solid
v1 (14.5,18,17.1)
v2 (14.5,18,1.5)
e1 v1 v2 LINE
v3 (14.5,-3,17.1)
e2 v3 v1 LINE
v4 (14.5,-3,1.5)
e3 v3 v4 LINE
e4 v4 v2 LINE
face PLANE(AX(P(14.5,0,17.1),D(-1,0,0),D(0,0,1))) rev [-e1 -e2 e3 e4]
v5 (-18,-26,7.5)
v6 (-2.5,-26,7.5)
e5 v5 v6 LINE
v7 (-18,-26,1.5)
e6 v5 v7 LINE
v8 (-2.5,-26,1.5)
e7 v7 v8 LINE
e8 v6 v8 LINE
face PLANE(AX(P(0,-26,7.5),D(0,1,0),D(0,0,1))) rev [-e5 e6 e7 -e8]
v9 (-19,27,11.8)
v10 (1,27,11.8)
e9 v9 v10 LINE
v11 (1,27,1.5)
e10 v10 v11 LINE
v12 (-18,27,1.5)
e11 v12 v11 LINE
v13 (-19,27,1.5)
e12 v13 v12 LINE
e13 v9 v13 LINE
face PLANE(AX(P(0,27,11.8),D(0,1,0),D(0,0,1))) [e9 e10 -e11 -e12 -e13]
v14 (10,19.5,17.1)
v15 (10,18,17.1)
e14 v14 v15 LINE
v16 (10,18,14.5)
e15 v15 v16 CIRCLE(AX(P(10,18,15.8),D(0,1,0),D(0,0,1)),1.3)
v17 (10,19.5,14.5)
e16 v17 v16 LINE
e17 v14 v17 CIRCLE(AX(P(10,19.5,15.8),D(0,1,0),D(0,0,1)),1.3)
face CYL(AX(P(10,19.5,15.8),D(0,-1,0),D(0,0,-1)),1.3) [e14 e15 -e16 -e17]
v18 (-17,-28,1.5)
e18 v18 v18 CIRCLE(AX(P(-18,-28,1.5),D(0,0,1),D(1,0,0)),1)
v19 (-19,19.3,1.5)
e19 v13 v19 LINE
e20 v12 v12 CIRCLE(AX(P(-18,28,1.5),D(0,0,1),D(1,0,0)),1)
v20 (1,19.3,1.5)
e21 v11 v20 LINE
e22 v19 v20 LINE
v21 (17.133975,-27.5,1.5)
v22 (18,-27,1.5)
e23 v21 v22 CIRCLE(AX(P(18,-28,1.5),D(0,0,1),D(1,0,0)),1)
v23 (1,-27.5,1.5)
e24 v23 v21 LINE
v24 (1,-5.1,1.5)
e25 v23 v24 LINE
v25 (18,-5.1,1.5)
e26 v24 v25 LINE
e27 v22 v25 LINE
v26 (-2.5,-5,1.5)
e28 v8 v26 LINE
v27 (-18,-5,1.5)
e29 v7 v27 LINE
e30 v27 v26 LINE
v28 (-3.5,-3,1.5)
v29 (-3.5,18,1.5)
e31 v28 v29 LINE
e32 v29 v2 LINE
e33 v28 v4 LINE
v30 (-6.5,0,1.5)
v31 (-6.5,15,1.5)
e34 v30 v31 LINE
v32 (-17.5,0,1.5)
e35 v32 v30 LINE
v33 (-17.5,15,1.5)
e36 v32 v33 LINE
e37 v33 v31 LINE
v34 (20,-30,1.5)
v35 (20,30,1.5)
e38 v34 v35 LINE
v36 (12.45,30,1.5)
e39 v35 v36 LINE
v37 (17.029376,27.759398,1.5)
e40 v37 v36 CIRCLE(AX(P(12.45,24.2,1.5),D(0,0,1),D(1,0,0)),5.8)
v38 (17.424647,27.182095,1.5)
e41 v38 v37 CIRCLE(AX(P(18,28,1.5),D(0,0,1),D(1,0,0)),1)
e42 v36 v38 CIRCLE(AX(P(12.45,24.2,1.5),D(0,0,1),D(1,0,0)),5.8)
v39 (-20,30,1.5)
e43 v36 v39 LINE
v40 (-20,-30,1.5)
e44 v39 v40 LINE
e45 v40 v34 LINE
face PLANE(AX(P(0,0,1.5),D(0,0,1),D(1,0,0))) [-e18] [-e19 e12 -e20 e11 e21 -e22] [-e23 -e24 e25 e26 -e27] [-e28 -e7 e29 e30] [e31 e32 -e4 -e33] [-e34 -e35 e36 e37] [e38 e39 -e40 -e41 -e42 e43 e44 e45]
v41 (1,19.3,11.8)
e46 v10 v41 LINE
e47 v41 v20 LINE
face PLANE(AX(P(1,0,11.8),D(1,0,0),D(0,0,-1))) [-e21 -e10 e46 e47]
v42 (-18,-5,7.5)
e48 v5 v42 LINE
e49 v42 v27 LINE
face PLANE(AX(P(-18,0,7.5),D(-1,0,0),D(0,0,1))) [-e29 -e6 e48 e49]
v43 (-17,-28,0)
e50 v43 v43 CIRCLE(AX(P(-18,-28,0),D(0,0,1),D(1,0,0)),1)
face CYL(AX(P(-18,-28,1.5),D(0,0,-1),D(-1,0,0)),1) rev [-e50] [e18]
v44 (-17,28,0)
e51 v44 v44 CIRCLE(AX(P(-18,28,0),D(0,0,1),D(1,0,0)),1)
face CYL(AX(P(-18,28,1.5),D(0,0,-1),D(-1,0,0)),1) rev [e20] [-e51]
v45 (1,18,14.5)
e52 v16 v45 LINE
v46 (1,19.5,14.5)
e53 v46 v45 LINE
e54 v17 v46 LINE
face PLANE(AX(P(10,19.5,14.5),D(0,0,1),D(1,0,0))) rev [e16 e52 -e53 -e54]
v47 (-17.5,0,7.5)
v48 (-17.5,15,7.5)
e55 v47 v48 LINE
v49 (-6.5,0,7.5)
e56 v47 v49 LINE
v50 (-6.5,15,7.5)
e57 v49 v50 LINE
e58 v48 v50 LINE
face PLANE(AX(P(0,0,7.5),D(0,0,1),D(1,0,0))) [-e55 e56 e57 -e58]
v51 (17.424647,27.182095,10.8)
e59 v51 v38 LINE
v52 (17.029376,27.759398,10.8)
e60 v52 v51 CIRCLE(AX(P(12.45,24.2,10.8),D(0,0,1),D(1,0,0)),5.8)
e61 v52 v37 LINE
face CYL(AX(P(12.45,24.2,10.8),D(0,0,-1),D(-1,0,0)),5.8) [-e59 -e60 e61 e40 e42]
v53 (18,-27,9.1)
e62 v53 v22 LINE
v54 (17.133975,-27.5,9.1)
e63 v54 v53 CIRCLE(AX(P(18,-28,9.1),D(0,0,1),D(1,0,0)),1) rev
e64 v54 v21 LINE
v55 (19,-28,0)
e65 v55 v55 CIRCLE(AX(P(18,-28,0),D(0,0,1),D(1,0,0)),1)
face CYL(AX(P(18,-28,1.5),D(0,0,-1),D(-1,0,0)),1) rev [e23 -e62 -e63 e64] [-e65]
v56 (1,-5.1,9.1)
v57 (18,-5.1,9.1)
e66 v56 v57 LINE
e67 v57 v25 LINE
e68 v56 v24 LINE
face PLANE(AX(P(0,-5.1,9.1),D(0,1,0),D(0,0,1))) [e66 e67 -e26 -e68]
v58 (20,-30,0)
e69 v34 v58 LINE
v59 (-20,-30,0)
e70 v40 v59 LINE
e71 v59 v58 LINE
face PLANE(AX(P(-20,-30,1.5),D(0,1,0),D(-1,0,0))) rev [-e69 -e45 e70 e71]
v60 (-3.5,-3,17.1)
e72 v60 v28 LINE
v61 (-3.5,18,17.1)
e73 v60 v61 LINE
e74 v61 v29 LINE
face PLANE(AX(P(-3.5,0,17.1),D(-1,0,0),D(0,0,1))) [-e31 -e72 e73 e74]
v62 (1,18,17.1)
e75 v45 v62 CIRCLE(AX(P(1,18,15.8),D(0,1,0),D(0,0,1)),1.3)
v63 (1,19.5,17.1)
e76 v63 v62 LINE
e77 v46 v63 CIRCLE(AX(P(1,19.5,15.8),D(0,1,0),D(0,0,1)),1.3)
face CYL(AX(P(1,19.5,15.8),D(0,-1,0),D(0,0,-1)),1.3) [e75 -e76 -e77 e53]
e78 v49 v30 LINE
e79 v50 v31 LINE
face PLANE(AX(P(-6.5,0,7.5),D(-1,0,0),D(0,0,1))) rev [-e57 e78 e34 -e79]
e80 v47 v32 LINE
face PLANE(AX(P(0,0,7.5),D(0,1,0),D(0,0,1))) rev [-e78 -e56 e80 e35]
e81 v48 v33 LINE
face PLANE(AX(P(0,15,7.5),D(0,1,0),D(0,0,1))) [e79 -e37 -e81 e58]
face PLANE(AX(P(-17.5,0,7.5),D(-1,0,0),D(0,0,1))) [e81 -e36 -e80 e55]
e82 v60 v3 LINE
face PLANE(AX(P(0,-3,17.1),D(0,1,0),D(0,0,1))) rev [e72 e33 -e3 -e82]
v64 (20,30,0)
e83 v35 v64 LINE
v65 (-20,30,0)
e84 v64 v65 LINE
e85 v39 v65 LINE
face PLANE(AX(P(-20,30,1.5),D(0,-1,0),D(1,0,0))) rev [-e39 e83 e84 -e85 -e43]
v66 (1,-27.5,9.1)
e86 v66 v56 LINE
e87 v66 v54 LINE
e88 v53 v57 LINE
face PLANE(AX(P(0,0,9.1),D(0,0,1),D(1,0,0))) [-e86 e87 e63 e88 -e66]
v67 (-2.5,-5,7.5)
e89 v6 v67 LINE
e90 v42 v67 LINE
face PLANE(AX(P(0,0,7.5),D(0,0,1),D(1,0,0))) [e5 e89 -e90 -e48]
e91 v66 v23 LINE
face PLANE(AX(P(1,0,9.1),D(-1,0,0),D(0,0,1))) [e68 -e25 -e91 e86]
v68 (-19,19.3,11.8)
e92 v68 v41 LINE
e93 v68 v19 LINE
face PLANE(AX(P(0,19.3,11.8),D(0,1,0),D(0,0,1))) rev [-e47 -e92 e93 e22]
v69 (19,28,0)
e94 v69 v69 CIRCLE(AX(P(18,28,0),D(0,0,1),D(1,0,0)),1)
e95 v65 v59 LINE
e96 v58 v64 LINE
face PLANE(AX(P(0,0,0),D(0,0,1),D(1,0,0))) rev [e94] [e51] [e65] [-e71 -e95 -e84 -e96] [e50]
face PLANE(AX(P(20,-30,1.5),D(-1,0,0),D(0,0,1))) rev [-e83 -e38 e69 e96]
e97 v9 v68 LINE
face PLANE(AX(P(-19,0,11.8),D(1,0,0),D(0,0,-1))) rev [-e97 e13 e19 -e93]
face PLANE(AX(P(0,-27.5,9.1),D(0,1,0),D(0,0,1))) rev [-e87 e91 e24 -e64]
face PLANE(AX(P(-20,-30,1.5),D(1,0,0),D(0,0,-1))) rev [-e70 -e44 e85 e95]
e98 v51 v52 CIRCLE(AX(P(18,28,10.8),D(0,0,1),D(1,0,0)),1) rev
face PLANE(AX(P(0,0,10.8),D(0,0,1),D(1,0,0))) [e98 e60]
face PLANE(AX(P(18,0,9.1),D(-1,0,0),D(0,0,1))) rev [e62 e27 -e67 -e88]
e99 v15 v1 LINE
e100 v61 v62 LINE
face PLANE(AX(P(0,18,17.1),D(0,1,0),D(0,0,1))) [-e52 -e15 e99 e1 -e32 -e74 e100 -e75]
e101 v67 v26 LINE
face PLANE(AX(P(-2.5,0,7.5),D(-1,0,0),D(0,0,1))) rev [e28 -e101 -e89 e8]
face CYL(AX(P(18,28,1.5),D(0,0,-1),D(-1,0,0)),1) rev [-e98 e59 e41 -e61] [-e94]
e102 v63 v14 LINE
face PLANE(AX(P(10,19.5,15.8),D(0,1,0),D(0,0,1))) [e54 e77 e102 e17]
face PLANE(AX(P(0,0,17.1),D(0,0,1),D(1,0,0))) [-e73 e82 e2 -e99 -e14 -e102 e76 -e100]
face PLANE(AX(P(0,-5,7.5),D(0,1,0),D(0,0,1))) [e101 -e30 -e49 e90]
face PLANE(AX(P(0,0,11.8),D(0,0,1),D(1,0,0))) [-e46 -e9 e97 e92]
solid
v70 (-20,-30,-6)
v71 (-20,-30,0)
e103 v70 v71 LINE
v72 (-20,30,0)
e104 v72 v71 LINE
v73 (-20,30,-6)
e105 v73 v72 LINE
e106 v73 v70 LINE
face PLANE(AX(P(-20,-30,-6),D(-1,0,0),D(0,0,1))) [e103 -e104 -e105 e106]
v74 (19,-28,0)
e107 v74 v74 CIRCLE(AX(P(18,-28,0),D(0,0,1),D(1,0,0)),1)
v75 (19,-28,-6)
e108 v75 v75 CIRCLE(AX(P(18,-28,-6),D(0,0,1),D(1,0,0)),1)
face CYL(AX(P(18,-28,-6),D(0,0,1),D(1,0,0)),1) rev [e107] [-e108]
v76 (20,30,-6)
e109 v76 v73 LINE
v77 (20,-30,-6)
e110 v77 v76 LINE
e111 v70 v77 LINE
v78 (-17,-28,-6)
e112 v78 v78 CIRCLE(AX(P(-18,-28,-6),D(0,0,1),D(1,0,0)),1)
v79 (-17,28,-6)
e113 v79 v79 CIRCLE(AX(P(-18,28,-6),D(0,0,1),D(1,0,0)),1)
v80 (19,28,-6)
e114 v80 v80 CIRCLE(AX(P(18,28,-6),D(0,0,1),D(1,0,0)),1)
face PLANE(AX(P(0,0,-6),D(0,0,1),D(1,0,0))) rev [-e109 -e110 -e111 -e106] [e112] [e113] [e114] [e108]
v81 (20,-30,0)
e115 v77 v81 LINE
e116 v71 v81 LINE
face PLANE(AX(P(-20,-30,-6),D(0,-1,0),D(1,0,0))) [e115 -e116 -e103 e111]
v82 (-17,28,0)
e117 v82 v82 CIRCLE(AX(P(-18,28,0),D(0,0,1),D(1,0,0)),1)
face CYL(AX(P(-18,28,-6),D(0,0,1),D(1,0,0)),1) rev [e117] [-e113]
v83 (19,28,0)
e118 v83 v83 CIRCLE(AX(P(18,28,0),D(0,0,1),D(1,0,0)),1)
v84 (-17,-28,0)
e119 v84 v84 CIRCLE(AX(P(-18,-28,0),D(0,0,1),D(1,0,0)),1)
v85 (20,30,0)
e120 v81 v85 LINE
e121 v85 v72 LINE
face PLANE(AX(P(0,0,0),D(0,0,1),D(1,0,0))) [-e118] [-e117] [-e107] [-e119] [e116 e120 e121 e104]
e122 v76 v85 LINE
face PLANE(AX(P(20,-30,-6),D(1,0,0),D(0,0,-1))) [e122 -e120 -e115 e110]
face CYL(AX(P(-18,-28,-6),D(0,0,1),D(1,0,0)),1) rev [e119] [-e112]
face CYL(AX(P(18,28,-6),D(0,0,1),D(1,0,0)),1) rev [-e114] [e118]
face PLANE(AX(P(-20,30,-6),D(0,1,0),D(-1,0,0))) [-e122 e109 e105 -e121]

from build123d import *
from build123d.topology import SkipClean

# Parameters (mm, degrees)
SKETCH1_W           = 60
SKETCH1_H           = 40
SKETCH1_R           = 1
BOSS_EXTRUDE1_DEPTH = 1.5
SKETCH2_W           = 15.5
SKETCH2_H           = 21
SKETCH2_W_2         = 11
SKETCH2_H_2         = 15
BOSS_EXTRUDE2_DEPTH = 6
BOSS_EXTRUDE3_DEPTH = 7.6
SKETCH2_4_W         = 18
SKETCH2_4_H         = 21
BOSS_EXTRUDE4_DEPTH = 15.6
BOSS_EXTRUDE5_DEPTH = 9.3
SKETCH2_6_W         = 20
SKETCH2_6_H         = 7.7
BOSS_EXTRUDE6_DEPTH = 10.3
SKETCH1_3_W         = 60
SKETCH1_3_H         = 40
SKETCH1_3_R         = 1
BOSS_EXTRUDE7_DEPTH = 6
BOSS_EXTRUDE8_DEPTH = 1.5


with BuildPart() as part:
    # Sketch1 → Boss-Extrude1 (new body)
    with BuildSketch(Plane(origin=(0, 0, 0), x_dir=(0, 1, 0), z_dir=(0, 0, 1))):
        Rectangle(SKETCH1_W, SKETCH1_H)
        with Locations((28, 18)):
            Circle(SKETCH1_R, mode=Mode.SUBTRACT)
        with Locations((-28, 18)):
            Circle(SKETCH1_R, mode=Mode.SUBTRACT)
        with Locations((-28, -18)):
            Circle(SKETCH1_R, mode=Mode.SUBTRACT)
        with Locations((28, -18)):
            Circle(SKETCH1_R, mode=Mode.SUBTRACT)
    extrude(amount=BOSS_EXTRUDE1_DEPTH)

    # Sketch2 → Boss-Extrude2 (add)
    with BuildSketch(Plane.XY.offset(1.5)):
        with Locations((-10.25, -15.5)):
            Rectangle(SKETCH2_W, SKETCH2_H)
        with Locations((-12, 7.5)):
            Rectangle(SKETCH2_W_2, SKETCH2_H_2)
    extrude(amount=BOSS_EXTRUDE2_DEPTH)

    # Sketch2<3> → Boss-Extrude3 (add)
    with SkipClean():  # the faces are left unmerged after this step: merging them gives an invalid solid
        with BuildSketch(Plane.XY.offset(1.5)):
            with BuildLine():
                Line((1, -5.1), (1, -27.5))
                Line((1, -27.5), (17.133974596, -27.5))
                ThreePointArc((17.133974596, -27.5), (17.5, -27.133974596), (18, -27))
                Line((18, -27), (18, -5.1))
                Line((18, -5.1), (1, -5.1))
            make_face()
        extrude(amount=BOSS_EXTRUDE3_DEPTH)

    # Sketch2<4> → Boss-Extrude4 (add)
    with SkipClean():  # the faces are left unmerged after this step: merging them gives an invalid solid
        with BuildSketch(Plane.XY.offset(1.5)):
            with Locations((5.5, 7.5)):
                Rectangle(SKETCH2_4_W, SKETCH2_4_H)
        extrude(amount=BOSS_EXTRUDE4_DEPTH)

    # Sketch2<5> → Boss-Extrude5 (add)
    with SkipClean():  # the faces are left unmerged after this step: merging them gives an invalid solid
        with BuildSketch(Plane.XY.offset(1.5)):
            with BuildLine():
                ThreePointArc((17.029376138, 27.759398009), (6.963635922, 22.318561933), (18.25, 24.2))
                ThreePointArc((18.25, 24.2), (18.039854669, 25.747102058), (17.424646629, 27.182095056))
                ThreePointArc((17.424646629, 27.182095056), (17.174875114, 27.435049628), (17.029376138, 27.759398009))
            make_face()
        extrude(amount=BOSS_EXTRUDE5_DEPTH)

    # Sketch2<6> → Boss-Extrude6 (add)
    with SkipClean():  # the faces are left unmerged after this step: merging them gives an invalid solid
        with BuildSketch(Plane.XY.offset(1.5)):
            with Locations((-9, 23.15)):
                Rectangle(SKETCH2_6_W, SKETCH2_6_H)
        extrude(amount=BOSS_EXTRUDE6_DEPTH)

    # Sketch4 → Boss-Extrude8 (add)
    with SkipClean():  # the faces are left unmerged after this step: merging them gives an invalid solid
        with BuildSketch(Plane(origin=(0, 18, 0), x_dir=(-1, 0, 0), z_dir=(0, 1, 0))):
            with BuildLine():
                Line((-10, 17.1), (-1, 17.1))
                ThreePointArc((-1, 17.1), (0.3, 15.8), (-1, 14.5))
                Line((-1, 14.5), (-10, 14.5))
                ThreePointArc((-10, 14.5), (-11.3, 15.8), (-10, 17.1))
            make_face()
        extrude(amount=BOSS_EXTRUDE8_DEPTH)


with BuildPart() as body_2:
    # Sketch1<3> → Boss-Extrude7 (new body)
    with BuildSketch(Plane(origin=(0, 0, 0), x_dir=(0, 1, 0), z_dir=(0, 0, 1))):
        Rectangle(SKETCH1_3_W, SKETCH1_3_H)
        with Locations((28, 18)):
            Circle(SKETCH1_3_R, mode=Mode.SUBTRACT)
        with Locations((-28, 18)):
            Circle(SKETCH1_3_R, mode=Mode.SUBTRACT)
        with Locations((-28, -18)):
            Circle(SKETCH1_3_R, mode=Mode.SUBTRACT)
        with Locations((28, -18)):
            Circle(SKETCH1_3_R, mode=Mode.SUBTRACT)
    extrude(amount=-BOSS_EXTRUDE7_DEPTH)


solid = Compound([part.part, body_2.part])
